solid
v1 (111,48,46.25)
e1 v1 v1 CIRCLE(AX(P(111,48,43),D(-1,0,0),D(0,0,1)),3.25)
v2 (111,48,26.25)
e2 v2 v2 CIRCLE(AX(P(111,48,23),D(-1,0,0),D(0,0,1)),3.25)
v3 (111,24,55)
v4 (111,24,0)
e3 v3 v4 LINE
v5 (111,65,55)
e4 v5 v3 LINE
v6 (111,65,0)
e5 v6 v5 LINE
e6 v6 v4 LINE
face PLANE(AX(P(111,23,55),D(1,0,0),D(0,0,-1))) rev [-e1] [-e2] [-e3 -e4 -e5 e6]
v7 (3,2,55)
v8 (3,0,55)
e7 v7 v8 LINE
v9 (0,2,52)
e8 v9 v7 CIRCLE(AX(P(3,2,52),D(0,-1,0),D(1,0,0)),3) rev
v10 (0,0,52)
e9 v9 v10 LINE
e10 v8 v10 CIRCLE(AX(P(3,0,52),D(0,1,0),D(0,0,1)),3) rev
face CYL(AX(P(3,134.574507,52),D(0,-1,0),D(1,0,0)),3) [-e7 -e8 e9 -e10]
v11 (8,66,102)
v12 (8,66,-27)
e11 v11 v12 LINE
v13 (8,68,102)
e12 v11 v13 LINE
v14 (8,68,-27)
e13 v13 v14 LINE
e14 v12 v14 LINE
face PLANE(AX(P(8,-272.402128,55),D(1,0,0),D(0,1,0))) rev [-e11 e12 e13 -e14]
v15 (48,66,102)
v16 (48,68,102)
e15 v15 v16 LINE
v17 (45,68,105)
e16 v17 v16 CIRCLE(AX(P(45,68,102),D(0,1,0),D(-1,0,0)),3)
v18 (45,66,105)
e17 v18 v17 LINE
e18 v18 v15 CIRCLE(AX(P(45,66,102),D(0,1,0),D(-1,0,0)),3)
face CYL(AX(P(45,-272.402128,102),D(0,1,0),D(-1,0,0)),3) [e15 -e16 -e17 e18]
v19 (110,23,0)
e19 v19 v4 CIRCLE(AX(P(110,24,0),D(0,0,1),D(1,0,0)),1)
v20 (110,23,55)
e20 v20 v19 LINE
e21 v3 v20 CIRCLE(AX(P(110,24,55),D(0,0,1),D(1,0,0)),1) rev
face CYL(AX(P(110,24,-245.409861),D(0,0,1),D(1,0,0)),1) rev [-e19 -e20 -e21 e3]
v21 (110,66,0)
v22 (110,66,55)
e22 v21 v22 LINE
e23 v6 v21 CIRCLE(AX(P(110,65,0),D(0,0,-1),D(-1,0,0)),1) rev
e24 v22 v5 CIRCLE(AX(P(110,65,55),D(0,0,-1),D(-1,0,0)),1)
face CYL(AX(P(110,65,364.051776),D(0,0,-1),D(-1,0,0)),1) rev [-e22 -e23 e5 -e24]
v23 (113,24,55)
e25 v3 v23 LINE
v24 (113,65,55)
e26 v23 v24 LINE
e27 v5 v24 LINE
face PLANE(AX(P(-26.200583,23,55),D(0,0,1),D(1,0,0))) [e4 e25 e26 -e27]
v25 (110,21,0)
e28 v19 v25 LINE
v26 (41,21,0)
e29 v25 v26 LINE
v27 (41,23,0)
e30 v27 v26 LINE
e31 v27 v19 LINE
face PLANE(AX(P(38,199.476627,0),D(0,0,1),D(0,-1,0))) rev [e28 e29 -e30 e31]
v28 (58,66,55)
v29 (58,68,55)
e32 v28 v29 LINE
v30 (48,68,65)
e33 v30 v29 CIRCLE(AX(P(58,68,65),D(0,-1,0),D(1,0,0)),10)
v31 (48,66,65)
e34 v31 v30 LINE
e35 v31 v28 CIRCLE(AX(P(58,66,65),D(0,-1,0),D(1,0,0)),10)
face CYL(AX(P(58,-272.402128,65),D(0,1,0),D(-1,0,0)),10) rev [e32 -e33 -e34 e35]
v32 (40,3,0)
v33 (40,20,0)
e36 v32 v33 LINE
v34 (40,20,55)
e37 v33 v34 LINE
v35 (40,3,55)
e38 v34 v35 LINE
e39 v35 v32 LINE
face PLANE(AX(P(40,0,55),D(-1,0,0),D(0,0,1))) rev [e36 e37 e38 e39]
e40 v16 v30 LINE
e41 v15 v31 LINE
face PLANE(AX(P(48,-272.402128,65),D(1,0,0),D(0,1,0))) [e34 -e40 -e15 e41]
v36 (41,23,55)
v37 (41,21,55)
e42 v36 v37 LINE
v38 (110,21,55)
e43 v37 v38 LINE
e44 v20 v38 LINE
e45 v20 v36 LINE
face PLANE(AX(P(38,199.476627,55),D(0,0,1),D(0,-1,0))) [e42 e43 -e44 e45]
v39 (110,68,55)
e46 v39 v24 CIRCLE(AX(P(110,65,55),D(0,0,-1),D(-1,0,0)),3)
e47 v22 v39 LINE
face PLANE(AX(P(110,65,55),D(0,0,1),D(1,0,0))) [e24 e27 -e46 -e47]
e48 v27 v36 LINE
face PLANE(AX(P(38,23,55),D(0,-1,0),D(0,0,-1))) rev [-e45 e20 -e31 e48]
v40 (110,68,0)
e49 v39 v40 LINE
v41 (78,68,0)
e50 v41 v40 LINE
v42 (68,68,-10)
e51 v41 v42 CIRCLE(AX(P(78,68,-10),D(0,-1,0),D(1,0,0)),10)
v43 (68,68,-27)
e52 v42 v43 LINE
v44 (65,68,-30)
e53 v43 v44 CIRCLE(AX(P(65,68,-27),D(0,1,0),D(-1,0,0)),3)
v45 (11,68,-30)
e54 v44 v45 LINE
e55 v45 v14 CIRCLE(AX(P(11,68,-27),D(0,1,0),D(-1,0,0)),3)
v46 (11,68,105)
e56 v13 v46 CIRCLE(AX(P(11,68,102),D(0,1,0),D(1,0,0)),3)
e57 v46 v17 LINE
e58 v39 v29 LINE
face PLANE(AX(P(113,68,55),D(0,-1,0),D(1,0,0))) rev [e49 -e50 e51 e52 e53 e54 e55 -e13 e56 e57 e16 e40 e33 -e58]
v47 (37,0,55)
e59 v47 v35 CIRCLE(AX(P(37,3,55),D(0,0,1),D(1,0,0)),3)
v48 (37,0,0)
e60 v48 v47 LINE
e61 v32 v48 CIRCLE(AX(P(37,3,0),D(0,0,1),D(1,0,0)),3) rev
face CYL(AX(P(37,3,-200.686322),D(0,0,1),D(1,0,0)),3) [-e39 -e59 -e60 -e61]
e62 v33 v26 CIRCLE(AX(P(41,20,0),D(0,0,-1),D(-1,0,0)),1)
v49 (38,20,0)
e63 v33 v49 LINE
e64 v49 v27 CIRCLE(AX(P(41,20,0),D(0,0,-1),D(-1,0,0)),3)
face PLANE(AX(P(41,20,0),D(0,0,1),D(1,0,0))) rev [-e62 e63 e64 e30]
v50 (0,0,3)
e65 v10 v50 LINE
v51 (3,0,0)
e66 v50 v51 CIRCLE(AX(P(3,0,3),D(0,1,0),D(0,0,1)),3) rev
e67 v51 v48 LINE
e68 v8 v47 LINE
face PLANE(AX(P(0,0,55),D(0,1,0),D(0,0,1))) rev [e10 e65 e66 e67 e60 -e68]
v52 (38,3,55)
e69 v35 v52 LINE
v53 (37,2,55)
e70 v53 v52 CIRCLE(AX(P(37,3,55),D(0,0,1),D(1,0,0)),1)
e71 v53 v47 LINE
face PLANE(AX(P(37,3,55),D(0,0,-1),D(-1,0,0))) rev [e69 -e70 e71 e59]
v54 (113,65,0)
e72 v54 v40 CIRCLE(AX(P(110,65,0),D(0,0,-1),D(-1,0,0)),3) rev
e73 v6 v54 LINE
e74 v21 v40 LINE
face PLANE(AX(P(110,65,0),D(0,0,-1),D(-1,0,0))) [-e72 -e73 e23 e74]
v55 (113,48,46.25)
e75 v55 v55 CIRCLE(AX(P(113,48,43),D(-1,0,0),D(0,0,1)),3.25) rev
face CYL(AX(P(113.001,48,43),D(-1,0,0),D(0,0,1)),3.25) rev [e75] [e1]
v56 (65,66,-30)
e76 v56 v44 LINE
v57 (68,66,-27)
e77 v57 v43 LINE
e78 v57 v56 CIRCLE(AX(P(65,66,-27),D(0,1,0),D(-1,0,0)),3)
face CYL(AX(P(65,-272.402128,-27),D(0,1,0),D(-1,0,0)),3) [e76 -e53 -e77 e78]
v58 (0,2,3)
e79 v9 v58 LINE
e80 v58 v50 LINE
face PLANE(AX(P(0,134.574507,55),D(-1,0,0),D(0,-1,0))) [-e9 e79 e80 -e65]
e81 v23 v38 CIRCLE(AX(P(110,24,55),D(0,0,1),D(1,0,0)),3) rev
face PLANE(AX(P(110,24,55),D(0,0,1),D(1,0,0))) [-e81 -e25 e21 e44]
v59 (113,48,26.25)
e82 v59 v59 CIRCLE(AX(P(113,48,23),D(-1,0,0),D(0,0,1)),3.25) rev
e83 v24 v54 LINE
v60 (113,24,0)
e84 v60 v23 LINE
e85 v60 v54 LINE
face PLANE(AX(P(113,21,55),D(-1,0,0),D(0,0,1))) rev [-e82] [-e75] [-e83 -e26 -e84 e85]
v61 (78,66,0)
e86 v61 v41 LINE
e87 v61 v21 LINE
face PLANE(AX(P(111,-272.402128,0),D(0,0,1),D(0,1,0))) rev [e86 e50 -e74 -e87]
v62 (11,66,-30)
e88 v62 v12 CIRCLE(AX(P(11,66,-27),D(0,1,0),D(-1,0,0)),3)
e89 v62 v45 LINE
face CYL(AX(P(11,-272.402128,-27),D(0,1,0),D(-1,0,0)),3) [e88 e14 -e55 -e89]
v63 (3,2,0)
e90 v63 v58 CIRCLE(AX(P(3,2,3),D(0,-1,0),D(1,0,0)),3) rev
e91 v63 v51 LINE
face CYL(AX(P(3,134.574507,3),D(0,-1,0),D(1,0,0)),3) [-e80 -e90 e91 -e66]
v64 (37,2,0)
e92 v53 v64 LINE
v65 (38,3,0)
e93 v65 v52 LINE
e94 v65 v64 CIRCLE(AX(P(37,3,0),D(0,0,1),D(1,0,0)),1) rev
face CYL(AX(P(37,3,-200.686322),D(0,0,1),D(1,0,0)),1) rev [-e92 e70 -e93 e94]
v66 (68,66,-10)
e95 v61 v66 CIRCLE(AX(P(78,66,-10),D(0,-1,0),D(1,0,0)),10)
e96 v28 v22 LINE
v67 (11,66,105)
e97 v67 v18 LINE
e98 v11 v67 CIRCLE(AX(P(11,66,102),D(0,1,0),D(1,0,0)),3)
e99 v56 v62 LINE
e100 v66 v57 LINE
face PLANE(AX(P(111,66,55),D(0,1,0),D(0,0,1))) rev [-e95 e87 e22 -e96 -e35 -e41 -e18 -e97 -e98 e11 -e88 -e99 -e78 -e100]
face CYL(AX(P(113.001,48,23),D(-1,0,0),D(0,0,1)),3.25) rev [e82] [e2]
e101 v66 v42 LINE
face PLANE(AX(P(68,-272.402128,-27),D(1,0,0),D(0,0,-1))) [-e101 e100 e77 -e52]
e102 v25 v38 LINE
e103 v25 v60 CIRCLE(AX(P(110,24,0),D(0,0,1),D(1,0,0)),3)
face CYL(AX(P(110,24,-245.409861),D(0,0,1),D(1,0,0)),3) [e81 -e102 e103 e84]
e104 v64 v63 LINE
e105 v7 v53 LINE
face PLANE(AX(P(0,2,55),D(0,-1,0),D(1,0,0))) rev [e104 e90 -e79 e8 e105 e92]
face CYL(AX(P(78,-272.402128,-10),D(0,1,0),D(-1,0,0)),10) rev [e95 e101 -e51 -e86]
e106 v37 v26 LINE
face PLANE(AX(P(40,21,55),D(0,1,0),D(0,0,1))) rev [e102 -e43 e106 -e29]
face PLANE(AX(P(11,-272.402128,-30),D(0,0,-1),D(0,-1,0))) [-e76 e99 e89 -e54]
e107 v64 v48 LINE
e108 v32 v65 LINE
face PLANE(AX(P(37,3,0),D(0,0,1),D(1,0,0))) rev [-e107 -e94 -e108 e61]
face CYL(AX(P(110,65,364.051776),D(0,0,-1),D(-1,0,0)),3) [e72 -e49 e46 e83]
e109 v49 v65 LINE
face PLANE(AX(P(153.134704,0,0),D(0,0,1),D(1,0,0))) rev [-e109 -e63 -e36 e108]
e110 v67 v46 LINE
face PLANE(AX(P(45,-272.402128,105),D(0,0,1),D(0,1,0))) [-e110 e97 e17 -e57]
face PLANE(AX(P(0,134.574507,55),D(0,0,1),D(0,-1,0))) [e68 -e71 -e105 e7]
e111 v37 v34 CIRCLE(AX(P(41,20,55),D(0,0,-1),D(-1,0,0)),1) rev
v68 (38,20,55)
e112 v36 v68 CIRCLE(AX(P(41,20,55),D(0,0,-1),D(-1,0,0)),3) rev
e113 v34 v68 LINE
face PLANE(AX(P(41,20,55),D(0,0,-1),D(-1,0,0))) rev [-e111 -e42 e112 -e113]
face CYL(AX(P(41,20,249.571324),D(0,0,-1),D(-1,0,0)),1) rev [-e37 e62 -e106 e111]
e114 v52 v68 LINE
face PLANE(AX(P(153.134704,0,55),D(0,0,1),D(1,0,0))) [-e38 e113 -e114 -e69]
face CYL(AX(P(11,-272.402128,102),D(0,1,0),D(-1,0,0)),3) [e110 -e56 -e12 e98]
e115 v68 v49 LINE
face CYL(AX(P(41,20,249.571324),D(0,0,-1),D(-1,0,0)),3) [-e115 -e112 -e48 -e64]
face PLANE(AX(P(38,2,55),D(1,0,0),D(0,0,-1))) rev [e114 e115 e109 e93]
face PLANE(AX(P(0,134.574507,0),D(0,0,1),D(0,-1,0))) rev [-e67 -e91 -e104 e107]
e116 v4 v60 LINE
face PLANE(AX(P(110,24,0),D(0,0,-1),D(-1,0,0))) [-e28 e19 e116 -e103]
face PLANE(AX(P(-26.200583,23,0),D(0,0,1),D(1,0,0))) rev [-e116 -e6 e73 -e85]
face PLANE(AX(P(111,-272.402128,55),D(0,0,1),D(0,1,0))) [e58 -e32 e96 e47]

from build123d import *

# Parameters (mm, degrees)
EXTRUDE_1_DEPTH             = 55
EXTRUDE_3_DEPTH             = 2
CUT_EXTRUDE_1_REACH         = 169.242
SKETCH_6_R                  = 3.25
FILLET_1_R                  = 3
SHEET_METAL_1_OUTLINE_W     = 2
SHEET_METAL_1_OUTLINE_H     = 135
SHEET_METAL_1_OUTLINE_W_2   = 23
SHEET_METAL_1_OUTLINE_H_2   = 55
SHEET_METAL_1_DEPTH         = 111
SHEET_START                 = 111
SHEET_METAL_1_2_DEPTH       = 2
SHEET_START_2               = -30
SHEET_METAL_1_3_DEPTH       = 135
SHEET_METAL_1_3_2_DEPTH     = 55
SHEET_METAL_1_3_3_OUTLINE_W = 40
SHEET_METAL_1_3_3_OUTLINE_H = 2
SHEET_METAL_1_3_3_DEPTH     = 135
SHEET_METAL_1_3_4_OUTLINE_W = 20
SHEET_METAL_1_3_4_OUTLINE_H = 2
SHEET_METAL_1_3_4_DEPTH     = 95
SHEET_START_3               = -10
SHEET_METAL_1_3_5_DEPTH     = 10
SHEET_START_4               = -1
SHEET_METAL_1_3_6_DEPTH     = 70


with BuildPart() as part:
    # Sketch 2 → 凸台-拉伸1 (new body)
    with BuildSketch(Plane.XY):
        Polygon((0, 0), (40, 0), (40, 21), (113, 21), (113, 68), (8, 68), (8, 66), (111, 66), (111, 23), (38, 23), (38, 2), (0, 2), align=None)
    extrude(amount=EXTRUDE_1_DEPTH)

    # 草图4 → 凸台-拉伸3 (add)
    with BuildSketch(Plane(origin=(0, 68, 0), x_dir=(1, 0, 0), z_dir=(0, 1, 0))):
        with BuildLine():
            Line((8, 27), (8, 0))
            Line((8, 0), (78, 0))
            ThreePointArc((78, 0), (70.928932188, 2.928932188), (68, 10))
            Line((68, 10), (68, 27))
            ThreePointArc((68, 27), (67.121320344, 29.121320344), (65, 30))
            Line((65, 30), (11, 30))
            ThreePointArc((11, 30), (8.878679656, 29.121320344), (8, 27))
        make_face()
        with BuildLine():
            Line((58, -55), (8, -55))
            Line((8, -55), (8, -102))
            ThreePointArc((8, -102), (8.878679656, -104.121320344), (11, -105))
            Line((11, -105), (45, -105))
            ThreePointArc((45, -105), (47.121320344, -104.121320344), (48, -102))
            Line((48, -102), (48, -65))
            ThreePointArc((48, -65), (50.928932188, -57.928932188), (58, -55))
        make_face()
    extrude(amount=-EXTRUDE_3_DEPTH)

    # 草图6 → 切除-拉伸1 (cut, up to next)
    with BuildSketch(Plane.ZY.offset(-111), mode=Mode.PRIVATE) as cut_extrude_1_sk1:
        with Locations((23, 48)):
            Circle(SKETCH_6_R)
    cut_extrude_1_tool1 = extrude(cut_extrude_1_sk1.sketch, amount=-CUT_EXTRUDE_1_REACH, mode=Mode.PRIVATE) & part.part
    # 草图6 → 切除-拉伸1 (cut, up to next)
    with BuildSketch(Plane.ZY.offset(-111), mode=Mode.PRIVATE) as cut_extrude_1_sk2:
        with Locations((43, 48)):
            Circle(SKETCH_6_R)
    cut_extrude_1_tool2 = extrude(cut_extrude_1_sk2.sketch, amount=-CUT_EXTRUDE_1_REACH, mode=Mode.PRIVATE) & part.part
    add(cut_extrude_1_tool1.solids().sort_by_distance((111, 48, 23))[0], mode=Mode.SUBTRACT)
    add(cut_extrude_1_tool2.solids().sort_by_distance((111, 48, 43))[0], mode=Mode.SUBTRACT)

    # 圆角1
    fillet_1_edges = [part.edges().sort_by_distance(p)[0] for p in [
        (0, 1, 0),
        (0, 1, 55),
    ]]
    fillet(fillet_1_edges, radius=FILLET_1_R)

    # Sheet Metal 1: read off the stored shape, not the designer's step
    # Sheet Metal 1 outline → Sheet Metal 1 (cut)
    with BuildSketch(Plane.YZ):
        with Locations((67, 37.5)):
            Rectangle(SHEET_METAL_1_OUTLINE_W, SHEET_METAL_1_OUTLINE_H)
        with Locations((11.5, 27.5)):
            Rectangle(SHEET_METAL_1_OUTLINE_W_2, SHEET_METAL_1_OUTLINE_H_2)
    extrude(amount=SHEET_METAL_1_DEPTH, mode=Mode.SUBTRACT)

    # Sheet Metal 1 2 outline → Sheet Metal 1 2 (add)
    with BuildSketch(Plane.YZ.offset(SHEET_START)):
        with BuildLine():
            Line((68, 0), (100, 0))
            ThreePointArc((100, 0), (107.071067812, -2.928932188), (110, -10))
            Line((110, -10), (110, -27))
            ThreePointArc((110, -27), (110.878679656, -29.121320344), (113, -30))
            Line((113, -30), (167, -30))
            ThreePointArc((167, -30), (169.121320344, -29.121320344), (170, -27))
            Line((170, -27), (170, 102))
            ThreePointArc((170, 102), (169.121320344, 104.121320344), (167, 105))
            Line((167, 105), (133, 105))
            ThreePointArc((133, 105), (130.878679656, 104.121320344), (130, 102))
            Line((130, 102), (130, 65))
            ThreePointArc((130, 65), (127.071067812, 57.928932188), (120, 55))
            Line((120, 55), (68, 55))
            Line((68, 55), (68, 0))
        make_face()
        with BuildLine():
            Line((21, 0), (21, 55))
            Line((21, 55), (-105, 55))
            ThreePointArc((-105, 55), (-107.121320344, 54.121320344), (-108, 52))
            Line((-108, 52), (-108, 3))
            ThreePointArc((-108, 3), (-107.121320344, 0.878679656), (-105, 0))
            Line((-105, 0), (21, 0))
        make_face()
    extrude(amount=SHEET_METAL_1_2_DEPTH)

    # Sheet Metal 1 3: read off the stored shape, not the designer's step
    # Sheet Metal 1 3 outline → Sheet Metal 1 3 (cut)
    with BuildSketch(Plane.XY.offset(SHEET_START_2)):
        with BuildLine():
            ThreePointArc((113, 24), (112.449489743, 22.267949192), (111, 21.171572875))
            Line((111, 21.171572875), (111, -108))
            Line((111, -108), (113, -108))
            Line((113, -108), (113, 24))
        make_face()
        with BuildLine():
            ThreePointArc((111, 67.828427125), (112.449489743, 66.732050808), (113, 65))
            Line((113, 65), (113, 170))
            Line((113, 170), (111, 170))
            Line((111, 170), (111, 67.828427125))
        make_face()
    extrude(amount=SHEET_METAL_1_3_DEPTH, mode=Mode.SUBTRACT)

    # Sheet Metal 1 3 2 outline → Sheet Metal 1 3 2 (add)
    with BuildSketch(Plane.XY):
        with BuildLine():
            Line((37, 2), (0, 2))
            Line((0, 2), (0, 0))
            Line((0, 0), (37, 0))
            ThreePointArc((37, 0), (39.121320344, 0.878679656), (40, 3))
            Line((40, 3), (40, 20))
            ThreePointArc((40, 20), (40.292893219, 20.707106781), (41, 21))
            Line((41, 21), (110, 21))
            ThreePointArc((110, 21), (110.507305936, 21.043204321), (111, 21.171572875))
            Line((111, 21.171572875), (111, 24))
            ThreePointArc((111, 24), (110.707106781, 23.292893219), (110, 23))
            Line((110, 23), (41, 23))
            ThreePointArc((41, 23), (38.878679656, 22.121320344), (38, 20))
            Line((38, 20), (38, 3))
            ThreePointArc((38, 3), (37.707106781, 2.292893219), (37, 2))
        make_face()
        with BuildLine():
            ThreePointArc((110, 66), (110.707106781, 65.707106781), (111, 65))
            Line((111, 65), (111, 67.828427125))
            ThreePointArc((111, 67.828427125), (110.507305936, 67.956795679), (110, 68))
            Line((110, 68), (8, 68))
            Line((8, 68), (8, 66))
            Line((8, 66), (110, 66))
        make_face()
    extrude(amount=SHEET_METAL_1_3_2_DEPTH)

    # Sheet Metal 1 3 3 outline → Sheet Metal 1 3 3 (add)
    with BuildSketch(Plane.XY.offset(SHEET_START_2)):
        with Locations((28, 67)):
            Rectangle(SHEET_METAL_1_3_3_OUTLINE_W, SHEET_METAL_1_3_3_OUTLINE_H)
    extrude(amount=SHEET_METAL_1_3_3_DEPTH)

    # Sheet Metal 1 3 4 outline → Sheet Metal 1 3 4 (add)
    with BuildSketch(Plane.XY.offset(SHEET_START_2)):
        with Locations((58, 67)):
            Rectangle(SHEET_METAL_1_3_4_OUTLINE_W, SHEET_METAL_1_3_4_OUTLINE_H)
    extrude(amount=SHEET_METAL_1_3_4_DEPTH)

    # Sheet Metal 1 3 5 outline → Sheet Metal 1 3 5 (add)
    with BuildSketch(Plane.XY.offset(SHEET_START_3)):
        with BuildLine():
            Line((68, 68), (68, 66))
            Line((68, 66), (110, 66))
            ThreePointArc((110, 66), (110.707106781, 65.707106781), (111, 65))
            Line((111, 65), (111, 67.828427125))
            ThreePointArc((111, 67.828427125), (110.507305936, 67.956795679), (110, 68))
            Line((110, 68), (68, 68))
        make_face()
    extrude(amount=SHEET_METAL_1_3_5_DEPTH)

    # Sheet Metal 1 3 6 outline → Sheet Metal 1 3 6 (cut)
    with BuildSketch(Plane(origin=(0, 0, 0), x_dir=(1, 0, 0), z_dir=(0, 1, 0)).offset(SHEET_START_4)):
        with BuildLine():
            Line((0, -55), (3, -55))
            ThreePointArc((3, -55), (0.878679656, -54.121320344), (0, -52))
            Line((0, -52), (0, -55))
        make_face()
        with BuildLine():
            Line((0, 0), (0, -3))
            ThreePointArc((0, -3), (0.878679656, -0.878679656), (3, 0))
            Line((3, 0), (0, 0))
        make_face()
        with BuildLine():
            ThreePointArc((11, -105), (8.878679656, -104.121320344), (8, -102))
            Line((8, -102), (8, -105))
            Line((8, -105), (11, -105))
        make_face()
        with BuildLine():
            Line((8, 30), (8, 27))
            ThreePointArc((8, 27), (8.878679656, 29.121320344), (11, 30))
            Line((11, 30), (8, 30))
        make_face()
        with BuildLine():
            ThreePointArc((48, -102), (47.121320344, -104.121320344), (45, -105))
            Line((45, -105), (48, -105))
            Line((48, -105), (48, -102))
        make_face()
        with BuildLine():
            Line((68, 30), (65, 30))
            ThreePointArc((65, 30), (67.121320344, 29.121320344), (68, 27))
            Line((68, 27), (68, 30))
        make_face()
        with BuildLine():
            Line((68, -55), (58, -55))
            ThreePointArc((58, -55), (50.928932188, -57.928932188), (48, -65))
            Line((48, -65), (68, -65))
            Line((68, -65), (68, -55))
        make_face()
        with BuildLine():
            ThreePointArc((68, 10), (70.928932188, 2.928932188), (78, 0))
            Line((78, 0), (111, 0))
            Line((111, 0), (111, 10))
            Line((111, 10), (68, 10))
        make_face()
    extrude(amount=SHEET_METAL_1_3_6_DEPTH, mode=Mode.SUBTRACT)


solid = part.part
